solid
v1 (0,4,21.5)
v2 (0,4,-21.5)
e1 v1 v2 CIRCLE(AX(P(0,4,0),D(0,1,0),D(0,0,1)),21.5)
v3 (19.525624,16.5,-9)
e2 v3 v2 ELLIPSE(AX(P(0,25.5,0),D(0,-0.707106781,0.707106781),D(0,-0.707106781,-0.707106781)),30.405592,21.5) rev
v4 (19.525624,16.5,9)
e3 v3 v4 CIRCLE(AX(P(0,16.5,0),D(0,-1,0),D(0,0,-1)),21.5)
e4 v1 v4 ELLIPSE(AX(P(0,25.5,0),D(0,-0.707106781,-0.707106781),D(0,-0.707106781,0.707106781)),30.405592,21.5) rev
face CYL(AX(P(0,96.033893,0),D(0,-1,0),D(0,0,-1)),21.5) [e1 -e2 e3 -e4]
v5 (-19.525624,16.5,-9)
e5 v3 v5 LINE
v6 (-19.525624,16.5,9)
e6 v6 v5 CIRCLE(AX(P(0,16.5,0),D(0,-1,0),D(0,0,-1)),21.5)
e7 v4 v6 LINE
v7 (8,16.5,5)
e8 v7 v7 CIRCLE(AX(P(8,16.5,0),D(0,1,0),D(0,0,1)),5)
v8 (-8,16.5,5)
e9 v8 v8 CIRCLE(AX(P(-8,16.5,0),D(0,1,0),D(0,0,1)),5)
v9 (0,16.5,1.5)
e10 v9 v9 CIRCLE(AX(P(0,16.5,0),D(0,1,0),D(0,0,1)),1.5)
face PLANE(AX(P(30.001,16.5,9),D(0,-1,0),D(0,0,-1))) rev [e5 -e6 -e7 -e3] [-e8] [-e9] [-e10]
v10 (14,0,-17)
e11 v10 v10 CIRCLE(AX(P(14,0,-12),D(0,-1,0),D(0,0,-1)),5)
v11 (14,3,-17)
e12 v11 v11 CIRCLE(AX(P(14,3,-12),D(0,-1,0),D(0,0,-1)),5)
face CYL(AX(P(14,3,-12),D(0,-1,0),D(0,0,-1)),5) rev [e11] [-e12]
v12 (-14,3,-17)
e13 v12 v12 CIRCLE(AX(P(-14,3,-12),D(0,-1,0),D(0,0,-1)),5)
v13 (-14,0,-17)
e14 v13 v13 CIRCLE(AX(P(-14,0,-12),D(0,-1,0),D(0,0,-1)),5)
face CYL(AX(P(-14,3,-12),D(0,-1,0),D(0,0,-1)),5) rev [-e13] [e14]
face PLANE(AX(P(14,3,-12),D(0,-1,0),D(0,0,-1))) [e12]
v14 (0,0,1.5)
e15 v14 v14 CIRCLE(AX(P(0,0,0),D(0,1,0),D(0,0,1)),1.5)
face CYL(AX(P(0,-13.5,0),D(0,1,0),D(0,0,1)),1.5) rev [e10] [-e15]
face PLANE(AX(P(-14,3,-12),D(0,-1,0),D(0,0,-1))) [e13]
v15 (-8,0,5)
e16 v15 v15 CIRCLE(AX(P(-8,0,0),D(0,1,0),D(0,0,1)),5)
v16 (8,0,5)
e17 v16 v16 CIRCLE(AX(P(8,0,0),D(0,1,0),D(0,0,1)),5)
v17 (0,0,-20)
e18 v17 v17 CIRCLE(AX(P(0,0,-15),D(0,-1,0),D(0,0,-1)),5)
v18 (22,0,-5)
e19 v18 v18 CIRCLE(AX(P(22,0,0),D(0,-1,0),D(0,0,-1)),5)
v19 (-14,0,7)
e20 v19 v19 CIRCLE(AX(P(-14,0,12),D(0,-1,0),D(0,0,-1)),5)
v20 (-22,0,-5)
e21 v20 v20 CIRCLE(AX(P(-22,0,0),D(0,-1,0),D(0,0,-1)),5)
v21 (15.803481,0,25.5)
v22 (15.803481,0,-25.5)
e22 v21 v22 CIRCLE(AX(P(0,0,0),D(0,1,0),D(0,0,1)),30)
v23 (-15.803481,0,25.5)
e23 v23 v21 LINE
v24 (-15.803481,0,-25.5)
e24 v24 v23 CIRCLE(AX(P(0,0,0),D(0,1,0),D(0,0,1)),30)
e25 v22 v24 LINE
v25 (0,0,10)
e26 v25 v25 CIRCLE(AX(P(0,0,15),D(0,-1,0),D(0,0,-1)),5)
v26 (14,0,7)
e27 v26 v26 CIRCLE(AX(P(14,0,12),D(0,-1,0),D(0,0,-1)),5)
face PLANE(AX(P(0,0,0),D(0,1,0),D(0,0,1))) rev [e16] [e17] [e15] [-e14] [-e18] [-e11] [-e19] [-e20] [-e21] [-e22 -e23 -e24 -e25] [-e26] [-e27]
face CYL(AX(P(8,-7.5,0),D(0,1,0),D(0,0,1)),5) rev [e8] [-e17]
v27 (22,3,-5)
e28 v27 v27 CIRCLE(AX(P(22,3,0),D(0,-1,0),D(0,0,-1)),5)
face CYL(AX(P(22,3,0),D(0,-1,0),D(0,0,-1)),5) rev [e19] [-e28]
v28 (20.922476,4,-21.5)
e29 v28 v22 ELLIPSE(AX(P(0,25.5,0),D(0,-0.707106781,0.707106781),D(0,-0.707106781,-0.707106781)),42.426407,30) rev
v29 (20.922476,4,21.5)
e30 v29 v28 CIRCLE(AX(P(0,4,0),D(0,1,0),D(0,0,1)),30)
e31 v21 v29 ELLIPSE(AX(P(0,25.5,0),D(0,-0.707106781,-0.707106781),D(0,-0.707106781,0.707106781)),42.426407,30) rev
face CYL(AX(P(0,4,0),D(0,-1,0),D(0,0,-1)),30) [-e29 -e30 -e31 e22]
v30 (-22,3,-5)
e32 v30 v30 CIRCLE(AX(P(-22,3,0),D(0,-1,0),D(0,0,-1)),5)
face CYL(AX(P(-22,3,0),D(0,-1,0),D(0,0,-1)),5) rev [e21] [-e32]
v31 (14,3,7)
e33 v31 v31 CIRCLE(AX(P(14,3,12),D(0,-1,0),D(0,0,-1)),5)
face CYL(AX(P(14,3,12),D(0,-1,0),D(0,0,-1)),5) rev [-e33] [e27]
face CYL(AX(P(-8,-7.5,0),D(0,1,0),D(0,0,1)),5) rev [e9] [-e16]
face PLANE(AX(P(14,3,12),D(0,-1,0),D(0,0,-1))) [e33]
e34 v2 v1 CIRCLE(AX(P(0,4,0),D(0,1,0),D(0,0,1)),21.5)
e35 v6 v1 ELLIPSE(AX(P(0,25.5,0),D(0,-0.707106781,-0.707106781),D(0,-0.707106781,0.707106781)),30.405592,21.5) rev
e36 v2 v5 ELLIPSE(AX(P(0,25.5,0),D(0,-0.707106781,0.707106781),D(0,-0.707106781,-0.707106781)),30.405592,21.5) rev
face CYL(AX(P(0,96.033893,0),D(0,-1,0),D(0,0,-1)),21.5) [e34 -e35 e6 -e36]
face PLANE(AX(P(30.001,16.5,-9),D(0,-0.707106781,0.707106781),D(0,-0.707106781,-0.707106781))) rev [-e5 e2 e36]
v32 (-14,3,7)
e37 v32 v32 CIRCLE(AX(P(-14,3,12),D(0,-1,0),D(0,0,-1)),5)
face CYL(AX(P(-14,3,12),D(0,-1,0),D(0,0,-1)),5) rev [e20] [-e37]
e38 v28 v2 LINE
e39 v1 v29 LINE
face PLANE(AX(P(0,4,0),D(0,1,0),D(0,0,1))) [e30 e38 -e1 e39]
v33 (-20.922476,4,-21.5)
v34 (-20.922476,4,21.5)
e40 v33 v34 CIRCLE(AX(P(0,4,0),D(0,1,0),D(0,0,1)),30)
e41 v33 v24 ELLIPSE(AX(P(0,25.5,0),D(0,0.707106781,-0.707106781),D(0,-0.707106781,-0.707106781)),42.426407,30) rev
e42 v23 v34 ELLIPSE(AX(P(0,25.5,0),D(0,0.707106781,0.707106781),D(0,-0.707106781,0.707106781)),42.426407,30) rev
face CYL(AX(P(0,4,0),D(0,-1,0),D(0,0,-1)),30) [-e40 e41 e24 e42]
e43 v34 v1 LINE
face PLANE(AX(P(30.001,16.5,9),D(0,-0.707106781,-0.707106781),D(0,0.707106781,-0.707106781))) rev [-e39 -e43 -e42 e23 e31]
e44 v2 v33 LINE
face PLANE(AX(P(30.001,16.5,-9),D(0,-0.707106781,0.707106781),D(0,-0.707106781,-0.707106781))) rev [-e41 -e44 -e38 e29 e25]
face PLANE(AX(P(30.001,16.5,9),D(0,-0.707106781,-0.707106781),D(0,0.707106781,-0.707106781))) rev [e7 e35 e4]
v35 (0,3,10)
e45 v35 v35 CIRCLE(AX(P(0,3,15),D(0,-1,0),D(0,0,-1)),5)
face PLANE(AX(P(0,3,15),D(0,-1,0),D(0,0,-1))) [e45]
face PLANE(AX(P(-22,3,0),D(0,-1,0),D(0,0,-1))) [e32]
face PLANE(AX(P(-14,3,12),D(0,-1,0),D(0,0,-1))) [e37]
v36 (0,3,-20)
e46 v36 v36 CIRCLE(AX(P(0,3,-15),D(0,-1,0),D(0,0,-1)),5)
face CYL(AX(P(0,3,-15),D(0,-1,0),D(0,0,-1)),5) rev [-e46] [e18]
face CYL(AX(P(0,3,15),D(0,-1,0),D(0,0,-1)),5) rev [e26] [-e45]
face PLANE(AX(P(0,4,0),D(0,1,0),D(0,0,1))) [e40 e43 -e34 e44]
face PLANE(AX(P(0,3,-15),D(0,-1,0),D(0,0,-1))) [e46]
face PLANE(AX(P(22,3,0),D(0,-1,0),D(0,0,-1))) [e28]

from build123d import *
from build123d.topology import SkipClean

# Parameters (mm, degrees)
SKETCH1_R                            = 30
BOSS_EXTRUDE1_DEPTH                  = 4
BOSS_EXTRUDE2_REACH                  = 44.615
BOSS_EXTRUDE2_END_RADIUS             = 30
BOSS_EXTRUDE2_DIRECTION_2_REACH      = 44.615
BOSS_EXTRUDE2_DIRECTION_2_END_RADIUS = 30
SKETCH3_OUTSIDE_W                    = 78.092
SKETCH3_OUTSIDE_H                    = 69.092
SKETCH3_OUTSIDE_R                    = 21.5
CUT_EXTRUDE2_DEPTH                   = 12.5
BOSS_EXTRUDE3_DEPTH                  = 18
BOSS_EXTRUDE4_DEPTH                  = 15
BOSS_EXTRUDE5_DEPTH                  = 15
CUT_EXTRUDE3_DEPTH                   = 44.292609069
CUT_EXTRUDE3_DEPTH_BACK              = 44.292609069
SKETCH8_R                            = 2
CUT_EXTRUDE8_DEPTH                   = 48.077064479
CUT_EXTRUDE8_DEPTH_BACK              = 48.077064479
CUT_EXTRUDE9_DEPTH                   = 59.659818207
CUT_EXTRUDE11_DEPTH                  = 20
CUT_EXTRUDE12_DEPTH                  = 20
CUT_EXTRUDE13_DEPTH                  = 20
CUT_EXTRUDE14_DEPTH                  = 44.292609069
CUT_EXTRUDE14_DEPTH_BACK             = 44.292609069
SKETCH25_W                           = 66.075437062
SKETCH25_H                           = 20.142243048
SKETCH26_R                           = 5
CUT_EXTRUDE15_DEPTH                  = 24
SKETCH27_R                           = 1.5
CUT_EXTRUDE16_DEPTH                  = 30
SKETCH28_R                           = 5
CUT_EXTRUDE17_DEPTH                  = 3


with BuildPart() as part:
    # Sketch1 → Boss-Extrude1 (new body)
    with BuildSketch(Plane(origin=(0, 0, 0), x_dir=(1, 0, 0), z_dir=(0, 1, 0))):
        with Locations(Location((0, 0, 0), (0, 0, 270))):
            Circle(SKETCH1_R)
    extrude(amount=BOSS_EXTRUDE1_DEPTH)

    # Boss-Extrude2: up to this cylinder (the profile starts inside it)
    with SkipClean():  # the faces are left unmerged after this step: merging them gives an invalid solid
        boss_extrude2_end = Plane(origin=(0, 9.396175, 0), z_dir=(0, -1, 0)) * Cylinder(BOSS_EXTRUDE2_END_RADIUS, 150.23, mode=Mode.PRIVATE)
        # Sketch2 → Boss-Extrude2 (add, up to the surface)
        with BuildSketch(Plane(origin=(0, 0, 0), x_dir=(0, 0, -1), z_dir=(1, 0, 0)), mode=Mode.PRIVATE) as boss_extrude2_sk1:
            Polygon((0, 4), (21.5, 4), (9, 16.5), (-9, 16.5), (-21.5, 4), align=None)
        boss_extrude2_tool1 = extrude(boss_extrude2_sk1.sketch, amount=BOSS_EXTRUDE2_REACH, mode=Mode.PRIVATE) & boss_extrude2_end
        add(boss_extrude2_tool1.solids().sort_by_distance((0, 9.396175, 0))[0])

    # Boss-Extrude2 direction 2: up to this cylinder (the profile starts inside it)
    with SkipClean():  # the faces are left unmerged after this step: merging them gives an invalid solid
        boss_extrude2_direction_2_end = Plane(origin=(0, 9.396175, 0), z_dir=(0, -1, 0)) * Cylinder(BOSS_EXTRUDE2_DIRECTION_2_END_RADIUS, 150.23, mode=Mode.PRIVATE)
        # Sketch2 → Boss-Extrude2 direction 2 (add, up to the surface)
        with BuildSketch(Plane(origin=(0, 0, 0), x_dir=(0, 0, -1), z_dir=(1, 0, 0)), mode=Mode.PRIVATE) as boss_extrude2_direction_2_sk1:
            Polygon((0, 4), (21.5, 4), (9, 16.5), (-9, 16.5), (-21.5, 4), align=None)
        boss_extrude2_direction_2_tool1 = extrude(boss_extrude2_direction_2_sk1.sketch, amount=-BOSS_EXTRUDE2_DIRECTION_2_REACH, mode=Mode.PRIVATE) & boss_extrude2_direction_2_end
        add(boss_extrude2_direction_2_tool1.solids().sort_by_distance((0, 9.396175, 0))[0])

    # SurfaceCut1
    split(bisect_by=Plane(origin=(0, 12.75, -12.75), x_dir=(1, 0, 0), z_dir=(0, 0.7071067811865558, -0.7071067811865392)), keep=Keep.BOTTOM)

    # SurfaceCut2
    split(bisect_by=Plane(origin=(0, 12.75, 12.75), x_dir=(1, 0, 0), z_dir=(0, 0.7071067811865509, 0.7071067811865442)), keep=Keep.BOTTOM)

    # Sketch3 outside → Cut-Extrude2 (cut)
    with SkipClean():  # the faces are left unmerged after this step: merging them gives an invalid solid
        with BuildSketch(Plane(origin=(0, 4, 0), x_dir=(1, 0, 0), z_dir=(0, 1, 0))):
            Rectangle(SKETCH3_OUTSIDE_W, SKETCH3_OUTSIDE_H)
            Circle(SKETCH3_OUTSIDE_R, mode=Mode.SUBTRACT)
        extrude(amount=CUT_EXTRUDE2_DEPTH, mode=Mode.SUBTRACT)

    # Sketch5 → Boss-Extrude3 (add)
    with SkipClean():  # the faces are left unmerged after this step: merging them gives an invalid solid
        with BuildSketch(Plane(origin=(0, 0, 0), x_dir=(-1, 0, 0), z_dir=(0, -1, 0))):
            Polygon((0, -6), (-17.5, -6), (-17.5, 6), (17.5, 6), (17.5, -6), align=None)
        extrude(amount=BOSS_EXTRUDE3_DEPTH)

    # Sketch6 → Boss-Extrude4 (add)
    with SkipClean():  # the faces are left unmerged after this step: merging them gives an invalid solid
        with BuildSketch(Plane.XZ):
            Polygon((0, 15), (7, 15), (7, 6), (-7, 6), (-7, 15), align=None)
        extrude(amount=BOSS_EXTRUDE4_DEPTH)

    # Sketch7 → Boss-Extrude5 (add)
    with SkipClean():  # the faces are left unmerged after this step: merging them gives an invalid solid
        with BuildSketch(Plane.XZ):
            Polygon((0, -15), (7, -15), (7, -6), (-7, -6), (-7, -15), align=None)
        extrude(amount=BOSS_EXTRUDE5_DEPTH)

    # Sketch8 → Cut-Extrude3 (cut, two sides: drawn at the far end of the back side and taken through both)
    with SkipClean():  # the faces are left unmerged after this step: merging them gives an invalid solid
        with BuildSketch(Plane.XY.offset(-CUT_EXTRUDE3_DEPTH_BACK)):
            with Locations((-12.5, -12.5)):
                Circle(SKETCH8_R)
            with Locations((12.5, -12.5)):
                Circle(SKETCH8_R)
        extrude(amount=CUT_EXTRUDE3_DEPTH + CUT_EXTRUDE3_DEPTH_BACK, mode=Mode.SUBTRACT)

    # Sketch16 → Cut-Extrude8 (cut, two sides: drawn at the far end of the back side and taken through both)
    with SkipClean():  # the faces are left unmerged after this step: merging them gives an invalid solid
        with BuildSketch(Plane.XY.offset(6).offset(-CUT_EXTRUDE8_DEPTH_BACK)):
            Polygon((17.5, -18), (17.5, -14.5), (14, -18), align=None)
            Polygon((-17.5, -18), (-14, -18), (-17.5, -14.5), align=None)
        extrude(amount=CUT_EXTRUDE8_DEPTH + CUT_EXTRUDE8_DEPTH_BACK, mode=Mode.SUBTRACT)

    # Sketch17 → Cut-Extrude9 (cut, through all)
    with SkipClean():  # the faces are left unmerged after this step: merging them gives an invalid solid
        with BuildSketch(Plane(origin=(10.365975269, -9.674910251, -8.062425209), x_dir=(-0.3613483622370374, 0.337258471421235, -0.8693009171531012), z_dir=(0.6355070151731325, -0.5931398808282571, -0.49428323402354774))):
            Polygon((-2.372510104, -6.189601271), (7.980636686, -0.706686759), (7.980636686, -10.965829024), align=None)
        extrude(amount=CUT_EXTRUDE9_DEPTH, mode=Mode.SUBTRACT)

    # Sketch19 → Cut-Extrude11 (cut)
    with SkipClean():  # the faces are left unmerged after this step: merging them gives an invalid solid
        with BuildSketch(Plane(origin=(-10.365975269, -9.674910251, -8.062425209), x_dir=(0.3613483622370374, 0.33725847142123494, -0.8693009171531012), z_dir=(0.6355070151731324, 0.5931398808282571, 0.4942832340235476))):
            Polygon((-2.372510104, -6.189601271), (7.980636686, -10.965829024), (7.980636686, -0.706686759), align=None)
        extrude(amount=-CUT_EXTRUDE11_DEPTH, mode=Mode.SUBTRACT)

    # Sketch20 → Cut-Extrude12 (cut)
    with SkipClean():  # the faces are left unmerged after this step: merging them gives an invalid solid
        with BuildSketch(Plane(origin=(-10.365975269, -9.674910251, 8.062425209), x_dir=(-0.3613483622370374, -0.3372584714212349, -0.8693009171531013), z_dir=(0.6355070151731326, 0.593139880828257, -0.49428323402354757))):
            Polygon((2.372510104, -6.189601271), (-7.980636686, -0.706686759), (-7.980636686, -10.965829024), align=None)
        extrude(amount=-CUT_EXTRUDE12_DEPTH, mode=Mode.SUBTRACT)

    # Sketch21 → Cut-Extrude13 (cut)
    with SkipClean():  # the faces are left unmerged after this step: merging them gives an invalid solid
        with BuildSketch(Plane(origin=(10.365975269, -9.674910251, 8.062425209), x_dir=(-0.3613483622370374, 0.3372584714212349, 0.8693009171531013), z_dir=(-0.6355070151731326, 0.593139880828257, -0.49428323402354757))):
            Polygon((-2.372510104, -6.189601271), (7.980636686, -0.706686759), (7.980636686, -10.965829024), align=None)
        extrude(amount=-CUT_EXTRUDE13_DEPTH, mode=Mode.SUBTRACT)

    # Sketch25 → Cut-Extrude14 (cut, two sides: drawn at the far end of the back side and taken through both)
    with SkipClean():  # the faces are left unmerged after this step: merging them gives an invalid solid
        with BuildSketch(Plane.XY.offset(-CUT_EXTRUDE14_DEPTH_BACK)):
            with Locations((0, -10.071121524)):
                Rectangle(SKETCH25_W, SKETCH25_H)
        extrude(amount=CUT_EXTRUDE14_DEPTH + CUT_EXTRUDE14_DEPTH_BACK, mode=Mode.SUBTRACT)

    # Sketch26 → Cut-Extrude15 (cut)
    with SkipClean():  # the faces are left unmerged after this step: merging them gives an invalid solid
        with BuildSketch(Plane(origin=(0, 16.5, 0), x_dir=(1, 0, 0), z_dir=(0, 1, 0))):
            with Locations(Location((-8, 0, 0), (0, 0, 270))):
                Circle(SKETCH26_R)
            with Locations(Location((8, 0, 0), (0, 0, 270))):
                Circle(SKETCH26_R)
        extrude(amount=-CUT_EXTRUDE15_DEPTH, mode=Mode.SUBTRACT)

    # Sketch27 → Cut-Extrude16 (cut)
    with SkipClean():  # the faces are left unmerged after this step: merging them gives an invalid solid
        with BuildSketch(Plane(origin=(0, 16.5, 0), x_dir=(1, 0, 0), z_dir=(0, 1, 0))):
            with Locations(Location((0, 0, 0), (0, 0, 270))):
                Circle(SKETCH27_R)
        extrude(amount=-CUT_EXTRUDE16_DEPTH, mode=Mode.SUBTRACT)

    # Sketch28 → Cut-Extrude17 (cut)
    with SkipClean():  # the faces are left unmerged after this step: merging them gives an invalid solid
        with BuildSketch(Plane.XZ):
            with Locations(Location((0, -15, 0), (0, 0, 270))):
                Circle(SKETCH28_R)
            with Locations(Location((22, 0, 0), (0, 0, 270))):
                Circle(SKETCH28_R)
            with Locations(Location((0, 15, 0), (0, 0, 270))):
                Circle(SKETCH28_R)
            with Locations(Location((-22, 0, 0), (0, 0, 270))):
                Circle(SKETCH28_R)
            with Locations(Location((-14, 12, 0), (0, 0, 270))):
                Circle(SKETCH28_R)
            with Locations(Location((14, 12, 0), (0, 0, 270))):
                Circle(SKETCH28_R)
            with Locations(Location((14, -12, 0), (0, 0, 270))):
                Circle(SKETCH28_R)
            with Locations(Location((-14, -12, 0), (0, 0, 270))):
                Circle(SKETCH28_R)
        extrude(amount=-CUT_EXTRUDE17_DEPTH, mode=Mode.SUBTRACT)


solid = part.part
